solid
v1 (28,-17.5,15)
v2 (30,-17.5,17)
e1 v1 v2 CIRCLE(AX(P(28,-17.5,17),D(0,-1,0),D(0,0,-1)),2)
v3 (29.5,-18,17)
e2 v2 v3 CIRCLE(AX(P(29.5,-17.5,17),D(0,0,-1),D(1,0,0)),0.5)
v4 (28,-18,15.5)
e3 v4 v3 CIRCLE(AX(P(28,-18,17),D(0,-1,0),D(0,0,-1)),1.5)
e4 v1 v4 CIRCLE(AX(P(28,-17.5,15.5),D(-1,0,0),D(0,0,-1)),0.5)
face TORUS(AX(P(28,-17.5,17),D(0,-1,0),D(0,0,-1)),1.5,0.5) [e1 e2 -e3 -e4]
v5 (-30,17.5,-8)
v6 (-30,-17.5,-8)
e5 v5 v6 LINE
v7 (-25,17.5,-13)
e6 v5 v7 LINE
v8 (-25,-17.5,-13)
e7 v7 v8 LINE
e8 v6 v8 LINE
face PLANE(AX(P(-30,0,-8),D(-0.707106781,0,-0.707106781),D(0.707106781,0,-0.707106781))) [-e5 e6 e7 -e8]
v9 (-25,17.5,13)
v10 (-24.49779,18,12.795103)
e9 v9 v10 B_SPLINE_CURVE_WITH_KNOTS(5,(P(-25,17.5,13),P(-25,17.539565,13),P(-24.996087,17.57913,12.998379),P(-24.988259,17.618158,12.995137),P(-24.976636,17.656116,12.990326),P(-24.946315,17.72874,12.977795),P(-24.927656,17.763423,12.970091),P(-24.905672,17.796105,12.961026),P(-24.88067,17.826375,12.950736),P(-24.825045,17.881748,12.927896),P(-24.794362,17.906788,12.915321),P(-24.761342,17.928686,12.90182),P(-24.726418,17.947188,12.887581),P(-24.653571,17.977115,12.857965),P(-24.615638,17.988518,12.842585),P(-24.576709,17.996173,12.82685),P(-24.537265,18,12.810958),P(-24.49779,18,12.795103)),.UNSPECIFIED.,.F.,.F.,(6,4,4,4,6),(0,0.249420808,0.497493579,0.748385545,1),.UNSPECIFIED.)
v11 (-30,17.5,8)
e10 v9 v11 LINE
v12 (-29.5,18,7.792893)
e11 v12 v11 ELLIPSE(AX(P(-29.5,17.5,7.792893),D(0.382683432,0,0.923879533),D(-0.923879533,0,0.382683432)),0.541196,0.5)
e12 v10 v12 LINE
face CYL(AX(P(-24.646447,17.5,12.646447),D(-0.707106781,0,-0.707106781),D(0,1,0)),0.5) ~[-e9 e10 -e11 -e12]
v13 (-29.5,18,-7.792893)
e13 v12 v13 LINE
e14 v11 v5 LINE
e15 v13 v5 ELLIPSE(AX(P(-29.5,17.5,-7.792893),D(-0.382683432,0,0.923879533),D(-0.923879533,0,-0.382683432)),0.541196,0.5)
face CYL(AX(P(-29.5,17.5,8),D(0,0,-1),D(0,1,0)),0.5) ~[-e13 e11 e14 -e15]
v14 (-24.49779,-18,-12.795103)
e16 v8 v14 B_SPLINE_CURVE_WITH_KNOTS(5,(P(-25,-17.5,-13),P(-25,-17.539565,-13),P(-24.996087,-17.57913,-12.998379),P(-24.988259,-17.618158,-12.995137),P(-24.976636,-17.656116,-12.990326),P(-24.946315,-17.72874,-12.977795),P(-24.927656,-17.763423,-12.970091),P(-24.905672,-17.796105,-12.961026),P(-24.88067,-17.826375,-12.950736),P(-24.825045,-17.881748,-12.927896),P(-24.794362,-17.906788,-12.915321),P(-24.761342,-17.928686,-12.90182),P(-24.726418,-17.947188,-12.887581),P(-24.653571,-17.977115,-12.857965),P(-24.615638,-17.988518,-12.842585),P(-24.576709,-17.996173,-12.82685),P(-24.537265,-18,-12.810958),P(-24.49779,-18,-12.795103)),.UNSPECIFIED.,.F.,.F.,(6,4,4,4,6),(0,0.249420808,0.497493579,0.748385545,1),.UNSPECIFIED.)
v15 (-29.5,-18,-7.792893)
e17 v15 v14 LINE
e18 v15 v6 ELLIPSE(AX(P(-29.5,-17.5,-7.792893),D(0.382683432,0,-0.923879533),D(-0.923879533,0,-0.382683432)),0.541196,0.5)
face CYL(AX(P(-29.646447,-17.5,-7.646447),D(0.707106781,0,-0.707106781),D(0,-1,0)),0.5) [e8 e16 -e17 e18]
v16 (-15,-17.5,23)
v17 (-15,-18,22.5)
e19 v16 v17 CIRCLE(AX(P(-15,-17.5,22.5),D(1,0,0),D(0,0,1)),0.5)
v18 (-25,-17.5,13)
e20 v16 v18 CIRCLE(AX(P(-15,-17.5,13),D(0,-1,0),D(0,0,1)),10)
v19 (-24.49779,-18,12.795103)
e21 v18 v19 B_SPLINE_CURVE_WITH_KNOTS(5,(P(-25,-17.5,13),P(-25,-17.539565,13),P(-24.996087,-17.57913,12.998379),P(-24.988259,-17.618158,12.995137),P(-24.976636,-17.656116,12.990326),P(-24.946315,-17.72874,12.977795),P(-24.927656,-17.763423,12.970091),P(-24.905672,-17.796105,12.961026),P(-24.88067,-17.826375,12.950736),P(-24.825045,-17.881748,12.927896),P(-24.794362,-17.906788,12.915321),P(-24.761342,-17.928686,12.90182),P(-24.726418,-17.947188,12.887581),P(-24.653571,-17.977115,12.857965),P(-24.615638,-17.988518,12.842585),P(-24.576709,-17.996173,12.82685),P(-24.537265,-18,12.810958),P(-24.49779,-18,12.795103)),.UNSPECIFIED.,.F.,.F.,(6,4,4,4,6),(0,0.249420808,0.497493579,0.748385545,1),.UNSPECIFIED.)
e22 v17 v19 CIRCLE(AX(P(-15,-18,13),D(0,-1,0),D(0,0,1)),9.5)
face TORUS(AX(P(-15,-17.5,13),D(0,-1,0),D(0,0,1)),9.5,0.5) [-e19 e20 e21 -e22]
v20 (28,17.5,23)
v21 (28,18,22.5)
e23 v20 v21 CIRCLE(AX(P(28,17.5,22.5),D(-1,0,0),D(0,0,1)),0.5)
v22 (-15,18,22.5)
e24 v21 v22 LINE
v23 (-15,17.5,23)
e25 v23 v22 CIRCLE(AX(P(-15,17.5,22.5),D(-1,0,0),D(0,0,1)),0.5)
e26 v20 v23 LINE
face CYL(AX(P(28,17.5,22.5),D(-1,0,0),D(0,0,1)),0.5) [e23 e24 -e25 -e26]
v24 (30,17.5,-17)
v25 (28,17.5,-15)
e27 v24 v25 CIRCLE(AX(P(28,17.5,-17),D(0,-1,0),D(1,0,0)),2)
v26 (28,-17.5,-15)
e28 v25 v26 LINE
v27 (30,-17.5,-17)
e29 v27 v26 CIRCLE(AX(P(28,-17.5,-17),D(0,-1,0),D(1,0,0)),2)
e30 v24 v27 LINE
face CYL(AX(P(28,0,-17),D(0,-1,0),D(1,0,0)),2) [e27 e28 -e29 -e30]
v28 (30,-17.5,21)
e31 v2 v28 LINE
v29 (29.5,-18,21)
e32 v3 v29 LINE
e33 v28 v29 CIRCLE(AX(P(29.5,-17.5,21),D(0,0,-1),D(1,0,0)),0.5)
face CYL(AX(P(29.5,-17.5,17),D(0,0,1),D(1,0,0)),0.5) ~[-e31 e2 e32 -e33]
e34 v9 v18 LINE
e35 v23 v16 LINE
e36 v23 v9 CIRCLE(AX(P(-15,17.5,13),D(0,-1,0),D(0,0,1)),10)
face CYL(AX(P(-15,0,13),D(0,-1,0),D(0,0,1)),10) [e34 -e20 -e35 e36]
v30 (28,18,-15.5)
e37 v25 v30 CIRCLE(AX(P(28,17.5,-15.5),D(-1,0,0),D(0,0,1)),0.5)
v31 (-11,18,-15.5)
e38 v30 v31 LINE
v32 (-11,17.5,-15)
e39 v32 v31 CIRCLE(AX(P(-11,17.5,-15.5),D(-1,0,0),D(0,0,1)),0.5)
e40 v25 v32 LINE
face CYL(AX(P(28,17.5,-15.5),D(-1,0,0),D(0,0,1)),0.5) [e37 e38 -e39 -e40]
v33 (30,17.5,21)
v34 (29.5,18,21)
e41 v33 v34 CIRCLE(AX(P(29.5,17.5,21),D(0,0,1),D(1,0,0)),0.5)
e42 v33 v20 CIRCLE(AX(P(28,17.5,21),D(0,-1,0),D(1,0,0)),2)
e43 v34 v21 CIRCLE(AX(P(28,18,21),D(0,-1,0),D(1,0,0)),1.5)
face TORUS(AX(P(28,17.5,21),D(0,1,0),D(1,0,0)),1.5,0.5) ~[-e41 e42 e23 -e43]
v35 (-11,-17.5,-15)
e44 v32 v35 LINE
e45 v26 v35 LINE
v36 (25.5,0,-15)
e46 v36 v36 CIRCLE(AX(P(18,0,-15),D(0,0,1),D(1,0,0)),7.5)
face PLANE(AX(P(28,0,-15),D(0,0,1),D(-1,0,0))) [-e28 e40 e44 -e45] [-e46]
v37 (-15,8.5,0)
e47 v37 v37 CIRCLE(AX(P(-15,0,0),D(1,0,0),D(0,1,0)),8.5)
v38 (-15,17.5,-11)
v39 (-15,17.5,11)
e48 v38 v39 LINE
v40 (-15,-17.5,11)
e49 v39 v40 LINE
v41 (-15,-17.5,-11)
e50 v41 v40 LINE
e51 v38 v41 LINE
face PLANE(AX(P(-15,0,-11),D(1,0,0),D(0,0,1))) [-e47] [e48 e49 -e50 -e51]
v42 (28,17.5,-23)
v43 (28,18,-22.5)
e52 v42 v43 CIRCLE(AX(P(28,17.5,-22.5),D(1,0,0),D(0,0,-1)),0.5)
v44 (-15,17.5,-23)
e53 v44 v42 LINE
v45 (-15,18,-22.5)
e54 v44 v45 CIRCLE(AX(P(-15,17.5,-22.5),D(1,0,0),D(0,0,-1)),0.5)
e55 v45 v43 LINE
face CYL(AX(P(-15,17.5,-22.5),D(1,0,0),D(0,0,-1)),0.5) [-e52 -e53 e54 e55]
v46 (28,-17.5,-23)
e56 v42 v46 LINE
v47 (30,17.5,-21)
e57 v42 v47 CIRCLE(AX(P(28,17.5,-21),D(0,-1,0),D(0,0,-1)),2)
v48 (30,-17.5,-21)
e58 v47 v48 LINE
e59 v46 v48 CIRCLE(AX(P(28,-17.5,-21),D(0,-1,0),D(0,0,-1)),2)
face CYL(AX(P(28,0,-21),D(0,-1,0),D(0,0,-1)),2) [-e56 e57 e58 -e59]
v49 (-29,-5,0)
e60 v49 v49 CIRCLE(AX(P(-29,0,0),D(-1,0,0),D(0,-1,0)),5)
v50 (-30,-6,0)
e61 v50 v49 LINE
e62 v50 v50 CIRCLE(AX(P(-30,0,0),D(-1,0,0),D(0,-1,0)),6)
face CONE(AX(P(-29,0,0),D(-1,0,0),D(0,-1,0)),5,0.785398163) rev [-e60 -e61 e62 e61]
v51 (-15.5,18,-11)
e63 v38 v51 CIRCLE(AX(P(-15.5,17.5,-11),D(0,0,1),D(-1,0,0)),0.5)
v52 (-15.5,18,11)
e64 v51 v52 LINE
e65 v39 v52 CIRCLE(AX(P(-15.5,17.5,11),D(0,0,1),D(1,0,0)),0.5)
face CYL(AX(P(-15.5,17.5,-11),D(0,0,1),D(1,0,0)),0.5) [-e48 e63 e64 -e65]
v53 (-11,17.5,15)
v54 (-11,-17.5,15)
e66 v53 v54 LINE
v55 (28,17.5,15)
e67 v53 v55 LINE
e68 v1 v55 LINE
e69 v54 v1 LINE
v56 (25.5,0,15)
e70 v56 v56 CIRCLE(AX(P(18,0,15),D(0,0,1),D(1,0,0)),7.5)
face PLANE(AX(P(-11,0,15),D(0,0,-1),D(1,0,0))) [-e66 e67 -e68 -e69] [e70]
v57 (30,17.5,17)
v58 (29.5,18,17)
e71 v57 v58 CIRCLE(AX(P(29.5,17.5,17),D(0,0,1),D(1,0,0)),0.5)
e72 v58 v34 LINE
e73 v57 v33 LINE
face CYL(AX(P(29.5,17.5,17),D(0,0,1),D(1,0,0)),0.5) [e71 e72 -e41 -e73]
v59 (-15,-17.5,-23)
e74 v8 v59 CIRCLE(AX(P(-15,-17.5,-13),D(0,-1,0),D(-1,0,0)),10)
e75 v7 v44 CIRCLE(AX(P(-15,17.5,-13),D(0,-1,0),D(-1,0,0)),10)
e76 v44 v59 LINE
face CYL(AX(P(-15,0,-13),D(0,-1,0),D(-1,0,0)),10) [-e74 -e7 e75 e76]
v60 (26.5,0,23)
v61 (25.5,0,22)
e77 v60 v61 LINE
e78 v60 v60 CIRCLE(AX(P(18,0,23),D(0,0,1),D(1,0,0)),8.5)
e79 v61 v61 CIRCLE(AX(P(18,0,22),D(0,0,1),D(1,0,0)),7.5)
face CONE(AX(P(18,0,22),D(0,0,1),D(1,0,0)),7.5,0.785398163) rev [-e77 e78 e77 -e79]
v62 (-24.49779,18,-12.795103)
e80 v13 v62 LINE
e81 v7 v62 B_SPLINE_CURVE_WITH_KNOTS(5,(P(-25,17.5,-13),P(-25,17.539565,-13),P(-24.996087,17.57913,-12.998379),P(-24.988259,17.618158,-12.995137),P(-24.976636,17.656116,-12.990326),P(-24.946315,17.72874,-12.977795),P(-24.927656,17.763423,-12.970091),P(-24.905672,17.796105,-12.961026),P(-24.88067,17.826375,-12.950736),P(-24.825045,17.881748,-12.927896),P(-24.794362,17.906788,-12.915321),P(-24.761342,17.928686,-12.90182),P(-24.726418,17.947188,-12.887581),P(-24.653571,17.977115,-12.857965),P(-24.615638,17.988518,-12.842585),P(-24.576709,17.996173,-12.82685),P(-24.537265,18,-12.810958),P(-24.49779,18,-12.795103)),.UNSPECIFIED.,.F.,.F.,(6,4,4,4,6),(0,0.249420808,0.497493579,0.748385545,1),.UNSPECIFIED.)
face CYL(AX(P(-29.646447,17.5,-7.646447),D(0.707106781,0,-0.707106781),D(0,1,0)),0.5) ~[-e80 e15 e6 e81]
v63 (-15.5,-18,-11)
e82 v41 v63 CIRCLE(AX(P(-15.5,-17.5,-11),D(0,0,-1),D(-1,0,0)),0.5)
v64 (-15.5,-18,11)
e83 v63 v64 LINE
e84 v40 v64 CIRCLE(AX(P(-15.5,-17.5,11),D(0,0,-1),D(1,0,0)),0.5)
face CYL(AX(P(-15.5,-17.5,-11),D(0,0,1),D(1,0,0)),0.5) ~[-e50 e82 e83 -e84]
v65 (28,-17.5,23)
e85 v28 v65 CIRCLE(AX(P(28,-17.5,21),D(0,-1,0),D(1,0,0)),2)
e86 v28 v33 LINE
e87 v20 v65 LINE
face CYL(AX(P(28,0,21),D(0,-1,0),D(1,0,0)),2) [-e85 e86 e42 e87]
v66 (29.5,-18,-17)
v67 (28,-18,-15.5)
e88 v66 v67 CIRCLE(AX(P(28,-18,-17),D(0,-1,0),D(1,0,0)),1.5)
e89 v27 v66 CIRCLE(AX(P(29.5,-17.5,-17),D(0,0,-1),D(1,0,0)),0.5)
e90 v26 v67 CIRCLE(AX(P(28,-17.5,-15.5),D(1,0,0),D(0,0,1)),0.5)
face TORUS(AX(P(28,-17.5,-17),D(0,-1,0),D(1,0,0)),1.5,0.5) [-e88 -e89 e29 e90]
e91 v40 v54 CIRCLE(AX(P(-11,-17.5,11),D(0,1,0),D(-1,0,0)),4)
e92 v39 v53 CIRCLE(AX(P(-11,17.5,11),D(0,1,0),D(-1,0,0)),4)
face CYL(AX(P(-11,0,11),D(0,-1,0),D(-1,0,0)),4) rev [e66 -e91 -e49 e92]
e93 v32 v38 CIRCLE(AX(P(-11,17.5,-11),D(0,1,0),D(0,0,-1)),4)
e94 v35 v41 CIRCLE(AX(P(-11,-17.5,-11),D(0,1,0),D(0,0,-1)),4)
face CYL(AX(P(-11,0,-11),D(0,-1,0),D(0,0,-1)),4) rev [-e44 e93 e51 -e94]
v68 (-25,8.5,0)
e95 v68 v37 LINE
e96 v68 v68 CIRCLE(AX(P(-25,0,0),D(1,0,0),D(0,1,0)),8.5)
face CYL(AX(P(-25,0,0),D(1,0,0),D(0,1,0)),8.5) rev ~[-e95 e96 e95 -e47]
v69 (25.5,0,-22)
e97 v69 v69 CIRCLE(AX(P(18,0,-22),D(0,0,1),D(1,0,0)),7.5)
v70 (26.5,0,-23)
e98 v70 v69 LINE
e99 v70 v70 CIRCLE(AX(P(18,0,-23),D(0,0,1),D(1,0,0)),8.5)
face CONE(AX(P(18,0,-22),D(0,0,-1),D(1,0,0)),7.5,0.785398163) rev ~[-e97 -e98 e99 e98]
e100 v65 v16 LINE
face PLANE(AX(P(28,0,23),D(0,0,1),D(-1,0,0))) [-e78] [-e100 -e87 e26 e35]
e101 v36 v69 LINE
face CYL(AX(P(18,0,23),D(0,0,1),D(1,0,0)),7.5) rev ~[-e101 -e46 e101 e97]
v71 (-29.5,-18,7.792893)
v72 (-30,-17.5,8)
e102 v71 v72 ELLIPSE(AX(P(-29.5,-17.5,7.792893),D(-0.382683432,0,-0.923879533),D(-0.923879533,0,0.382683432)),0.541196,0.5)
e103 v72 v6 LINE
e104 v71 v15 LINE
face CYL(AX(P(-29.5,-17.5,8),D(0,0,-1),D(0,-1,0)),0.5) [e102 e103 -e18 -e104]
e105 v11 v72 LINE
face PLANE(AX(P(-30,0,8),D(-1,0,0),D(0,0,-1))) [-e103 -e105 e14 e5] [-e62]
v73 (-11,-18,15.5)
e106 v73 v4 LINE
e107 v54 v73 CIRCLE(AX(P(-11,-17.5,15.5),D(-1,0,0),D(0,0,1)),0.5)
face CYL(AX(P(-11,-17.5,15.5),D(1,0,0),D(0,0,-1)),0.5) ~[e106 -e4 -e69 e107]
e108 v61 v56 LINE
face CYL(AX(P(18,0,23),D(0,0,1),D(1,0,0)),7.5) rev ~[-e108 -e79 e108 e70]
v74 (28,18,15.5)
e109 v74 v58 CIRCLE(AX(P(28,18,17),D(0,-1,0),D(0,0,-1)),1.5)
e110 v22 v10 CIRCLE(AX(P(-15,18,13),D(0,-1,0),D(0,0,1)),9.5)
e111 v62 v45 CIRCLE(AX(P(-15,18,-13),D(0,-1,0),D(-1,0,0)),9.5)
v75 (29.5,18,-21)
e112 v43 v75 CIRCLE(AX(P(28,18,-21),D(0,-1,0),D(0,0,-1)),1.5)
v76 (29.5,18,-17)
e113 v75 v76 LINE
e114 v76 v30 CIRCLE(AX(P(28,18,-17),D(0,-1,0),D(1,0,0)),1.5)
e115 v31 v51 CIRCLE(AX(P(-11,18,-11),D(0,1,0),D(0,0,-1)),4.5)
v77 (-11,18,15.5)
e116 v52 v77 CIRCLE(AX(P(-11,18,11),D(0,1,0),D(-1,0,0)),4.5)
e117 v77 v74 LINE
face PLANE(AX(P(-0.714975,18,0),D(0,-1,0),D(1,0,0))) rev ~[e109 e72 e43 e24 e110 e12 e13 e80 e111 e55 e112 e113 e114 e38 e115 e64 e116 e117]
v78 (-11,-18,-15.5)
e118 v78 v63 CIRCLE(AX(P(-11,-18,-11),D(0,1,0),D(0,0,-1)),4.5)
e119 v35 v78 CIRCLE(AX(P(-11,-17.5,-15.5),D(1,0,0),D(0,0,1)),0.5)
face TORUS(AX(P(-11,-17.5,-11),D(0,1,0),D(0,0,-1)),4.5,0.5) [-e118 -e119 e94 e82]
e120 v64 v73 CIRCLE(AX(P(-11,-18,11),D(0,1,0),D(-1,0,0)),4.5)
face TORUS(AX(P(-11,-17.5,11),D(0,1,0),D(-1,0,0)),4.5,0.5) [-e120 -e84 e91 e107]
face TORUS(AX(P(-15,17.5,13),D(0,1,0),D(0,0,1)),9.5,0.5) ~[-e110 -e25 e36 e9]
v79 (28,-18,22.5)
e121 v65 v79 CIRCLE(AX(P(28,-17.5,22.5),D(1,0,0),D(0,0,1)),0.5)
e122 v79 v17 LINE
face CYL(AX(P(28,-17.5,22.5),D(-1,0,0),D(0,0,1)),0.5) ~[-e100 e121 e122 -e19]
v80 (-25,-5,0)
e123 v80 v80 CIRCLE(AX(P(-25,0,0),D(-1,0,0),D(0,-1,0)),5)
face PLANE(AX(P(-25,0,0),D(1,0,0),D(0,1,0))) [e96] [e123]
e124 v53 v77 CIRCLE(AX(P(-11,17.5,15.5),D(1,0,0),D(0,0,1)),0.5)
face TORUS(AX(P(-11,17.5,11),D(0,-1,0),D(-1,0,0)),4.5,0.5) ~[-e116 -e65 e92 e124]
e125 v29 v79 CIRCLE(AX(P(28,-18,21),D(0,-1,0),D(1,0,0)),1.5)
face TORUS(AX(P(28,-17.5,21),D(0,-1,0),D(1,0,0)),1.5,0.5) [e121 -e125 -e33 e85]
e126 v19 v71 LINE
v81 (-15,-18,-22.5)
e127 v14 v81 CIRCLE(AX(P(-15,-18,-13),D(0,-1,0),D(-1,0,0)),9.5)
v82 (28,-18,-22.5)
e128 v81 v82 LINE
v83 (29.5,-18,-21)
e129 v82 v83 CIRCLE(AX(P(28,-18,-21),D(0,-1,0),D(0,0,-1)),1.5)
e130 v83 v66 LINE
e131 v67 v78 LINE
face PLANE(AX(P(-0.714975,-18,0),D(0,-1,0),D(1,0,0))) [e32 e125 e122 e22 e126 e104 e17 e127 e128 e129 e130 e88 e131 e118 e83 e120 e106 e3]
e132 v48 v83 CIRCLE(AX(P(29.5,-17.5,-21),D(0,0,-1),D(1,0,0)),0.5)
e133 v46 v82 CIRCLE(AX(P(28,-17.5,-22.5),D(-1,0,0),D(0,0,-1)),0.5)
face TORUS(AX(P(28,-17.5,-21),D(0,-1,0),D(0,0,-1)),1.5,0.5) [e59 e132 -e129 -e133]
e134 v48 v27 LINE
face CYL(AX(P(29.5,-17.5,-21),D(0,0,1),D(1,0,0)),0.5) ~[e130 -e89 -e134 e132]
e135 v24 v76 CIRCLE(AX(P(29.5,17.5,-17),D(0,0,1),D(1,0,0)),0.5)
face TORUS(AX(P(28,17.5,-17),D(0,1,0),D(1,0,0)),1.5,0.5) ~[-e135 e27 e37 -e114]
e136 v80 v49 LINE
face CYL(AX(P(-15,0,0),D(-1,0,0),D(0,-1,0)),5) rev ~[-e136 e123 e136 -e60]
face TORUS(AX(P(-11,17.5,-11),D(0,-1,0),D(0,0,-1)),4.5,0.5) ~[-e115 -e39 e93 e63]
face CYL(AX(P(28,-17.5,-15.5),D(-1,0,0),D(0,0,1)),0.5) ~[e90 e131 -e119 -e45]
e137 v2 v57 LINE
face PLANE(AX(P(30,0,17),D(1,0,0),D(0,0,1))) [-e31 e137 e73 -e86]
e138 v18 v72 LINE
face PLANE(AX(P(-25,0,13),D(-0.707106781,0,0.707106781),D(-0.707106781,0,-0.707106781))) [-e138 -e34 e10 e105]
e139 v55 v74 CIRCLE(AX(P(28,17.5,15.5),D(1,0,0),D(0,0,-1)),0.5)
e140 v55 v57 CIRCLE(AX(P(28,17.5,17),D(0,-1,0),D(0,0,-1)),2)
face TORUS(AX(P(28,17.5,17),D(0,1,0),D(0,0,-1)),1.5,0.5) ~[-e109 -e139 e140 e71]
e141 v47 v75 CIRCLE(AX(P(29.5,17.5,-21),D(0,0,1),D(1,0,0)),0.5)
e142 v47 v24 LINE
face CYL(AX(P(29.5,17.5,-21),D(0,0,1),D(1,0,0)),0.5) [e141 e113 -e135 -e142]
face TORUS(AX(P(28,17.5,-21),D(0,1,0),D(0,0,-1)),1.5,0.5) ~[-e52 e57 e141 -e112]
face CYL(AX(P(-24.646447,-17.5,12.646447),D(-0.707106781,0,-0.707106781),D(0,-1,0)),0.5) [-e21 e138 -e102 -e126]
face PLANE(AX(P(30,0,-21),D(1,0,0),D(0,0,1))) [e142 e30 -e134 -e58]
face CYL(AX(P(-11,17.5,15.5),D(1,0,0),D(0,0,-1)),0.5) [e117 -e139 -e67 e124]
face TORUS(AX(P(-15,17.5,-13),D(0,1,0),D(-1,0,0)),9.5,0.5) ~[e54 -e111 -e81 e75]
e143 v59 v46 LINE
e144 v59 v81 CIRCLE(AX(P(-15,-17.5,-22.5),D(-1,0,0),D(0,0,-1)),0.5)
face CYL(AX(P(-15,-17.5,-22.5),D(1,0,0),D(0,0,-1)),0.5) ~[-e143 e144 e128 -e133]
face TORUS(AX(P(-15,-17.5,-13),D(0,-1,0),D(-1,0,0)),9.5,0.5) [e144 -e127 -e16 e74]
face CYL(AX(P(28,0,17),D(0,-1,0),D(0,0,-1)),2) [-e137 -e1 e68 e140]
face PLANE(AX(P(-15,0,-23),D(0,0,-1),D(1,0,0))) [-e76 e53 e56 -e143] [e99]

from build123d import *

# Parameters (mm, degrees)
F1_DEPTH       = 18
F2_R           = 7.5
F3_DEPTH       = 46.001
F5_D           = 10
F5_CBORE_D     = 17
F5_CBORE_DEPTH = 10
F6_SIZE2       = 1
F6_SIZE        = 1
F7_R           = 0.5


with BuildPart() as f1:
    # F0 (on Front) → F1 (new body, symmetric)
    with BuildSketch(Plane.XZ):
        with BuildLine():
            ThreePointArc((30, 21), (29.4142135624, 22.4142135624), (28, 23))
            Line((28, 23), (-15, 23))
            ThreePointArc((-15, 23), (-22.0710678119, 20.0710678119), (-25, 13))
            Line((-25, 13), (-30, 8))
            Line((-30, 8), (-30, -8))
            Line((-30, -8), (-25, -13))
            ThreePointArc((-25, -13), (-22.0710678119, -20.0710678119), (-15, -23))
            Line((-15, -23), (28, -23))
            ThreePointArc((28, -23), (29.4142135624, -22.4142135624), (30, -21))
            Line((30, -21), (30, -17))
            ThreePointArc((30, -17), (29.4142135624, -15.5857864376), (28, -15))
            Line((28, -15), (-11, -15))
            ThreePointArc((-11, -15), (-13.8284271247, -13.8284271247), (-15, -11))
            Line((-15, -11), (-15, 11))
            ThreePointArc((-15, 11), (-13.8284271247, 13.8284271247), (-11, 15))
            Line((-11, 15), (28, 15))
            ThreePointArc((28, 15), (29.4142135624, 15.5857864376), (30, 17))
            Line((30, 17), (30, 21))
        make_face()
    extrude(amount=F1_DEPTH, both=True)

    # F2 (on face) → F3 (cut, through all)
    with BuildSketch(Plane.XY.offset(23)):
        with Locations((18, 0)):
            Circle(F2_R)
    extrude(amount=-F3_DEPTH, mode=Mode.SUBTRACT)

    # F5 (through all)
    with Locations(Plane.YZ.offset(-15)):
        with Locations((0, 0)):
            CounterBoreHole(F5_D / 2, F5_CBORE_D / 2, F5_CBORE_DEPTH)

    # F6
    f6_edges = [f1.edges().sort_by_distance(p)[0] for p in [
        (10.5, 0, -23),
        (10.5, 0, 23),
        (-30, -5, 0),
    ]]
    chamfer(f6_edges, length=F6_SIZE, length2=F6_SIZE2)

    # F7
    f7_edges = [f1.edges().sort_by_distance(p)[0] for p in [
        (29.414214, 18, 22.414214),
        (6.5, 18, 23),
        (-22.071068, 18, 20.071068),
        (-27.5, 18, 10.5),
        (-30, 18, 0),
        (-27.5, 18, -10.5),
        (-22.071068, 18, -20.071068),
        (6.5, 18, -23),
        (29.414214, 18, -22.414214),
        (30, 18, -19),
        (29.414214, 18, -15.585786),
        (8.5, 18, -15),
        (-13.828427, 18, -13.828427),
        (-15, 18, 0),
        (-13.828427, 18, 13.828427),
        (8.5, 18, 15),
        (29.414214, 18, 15.585786),
        (30, 18, 19),
        (29.414214, -18, 22.414214),
        (6.5, -18, 23),
        (-22.071068, -18, 20.071068),
        (-27.5, -18, 10.5),
        (-30, -18, 0),
        (-27.5, -18, -10.5),
        (-22.071068, -18, -20.071068),
        (6.5, -18, -23),
        (29.414214, -18, -22.414214),
        (30, -18, -19),
        (29.414214, -18, -15.585786),
        (8.5, -18, -15),
        (-13.828427, -18, -13.828427),
        (-15, -18, 0),
        (-13.828427, -18, 13.828427),
        (8.5, -18, 15),
        (29.414214, -18, 15.585786),
        (30, -18, 19),
    ]]
    fillet(f7_edges, radius=F7_R)


solid = f1.part
